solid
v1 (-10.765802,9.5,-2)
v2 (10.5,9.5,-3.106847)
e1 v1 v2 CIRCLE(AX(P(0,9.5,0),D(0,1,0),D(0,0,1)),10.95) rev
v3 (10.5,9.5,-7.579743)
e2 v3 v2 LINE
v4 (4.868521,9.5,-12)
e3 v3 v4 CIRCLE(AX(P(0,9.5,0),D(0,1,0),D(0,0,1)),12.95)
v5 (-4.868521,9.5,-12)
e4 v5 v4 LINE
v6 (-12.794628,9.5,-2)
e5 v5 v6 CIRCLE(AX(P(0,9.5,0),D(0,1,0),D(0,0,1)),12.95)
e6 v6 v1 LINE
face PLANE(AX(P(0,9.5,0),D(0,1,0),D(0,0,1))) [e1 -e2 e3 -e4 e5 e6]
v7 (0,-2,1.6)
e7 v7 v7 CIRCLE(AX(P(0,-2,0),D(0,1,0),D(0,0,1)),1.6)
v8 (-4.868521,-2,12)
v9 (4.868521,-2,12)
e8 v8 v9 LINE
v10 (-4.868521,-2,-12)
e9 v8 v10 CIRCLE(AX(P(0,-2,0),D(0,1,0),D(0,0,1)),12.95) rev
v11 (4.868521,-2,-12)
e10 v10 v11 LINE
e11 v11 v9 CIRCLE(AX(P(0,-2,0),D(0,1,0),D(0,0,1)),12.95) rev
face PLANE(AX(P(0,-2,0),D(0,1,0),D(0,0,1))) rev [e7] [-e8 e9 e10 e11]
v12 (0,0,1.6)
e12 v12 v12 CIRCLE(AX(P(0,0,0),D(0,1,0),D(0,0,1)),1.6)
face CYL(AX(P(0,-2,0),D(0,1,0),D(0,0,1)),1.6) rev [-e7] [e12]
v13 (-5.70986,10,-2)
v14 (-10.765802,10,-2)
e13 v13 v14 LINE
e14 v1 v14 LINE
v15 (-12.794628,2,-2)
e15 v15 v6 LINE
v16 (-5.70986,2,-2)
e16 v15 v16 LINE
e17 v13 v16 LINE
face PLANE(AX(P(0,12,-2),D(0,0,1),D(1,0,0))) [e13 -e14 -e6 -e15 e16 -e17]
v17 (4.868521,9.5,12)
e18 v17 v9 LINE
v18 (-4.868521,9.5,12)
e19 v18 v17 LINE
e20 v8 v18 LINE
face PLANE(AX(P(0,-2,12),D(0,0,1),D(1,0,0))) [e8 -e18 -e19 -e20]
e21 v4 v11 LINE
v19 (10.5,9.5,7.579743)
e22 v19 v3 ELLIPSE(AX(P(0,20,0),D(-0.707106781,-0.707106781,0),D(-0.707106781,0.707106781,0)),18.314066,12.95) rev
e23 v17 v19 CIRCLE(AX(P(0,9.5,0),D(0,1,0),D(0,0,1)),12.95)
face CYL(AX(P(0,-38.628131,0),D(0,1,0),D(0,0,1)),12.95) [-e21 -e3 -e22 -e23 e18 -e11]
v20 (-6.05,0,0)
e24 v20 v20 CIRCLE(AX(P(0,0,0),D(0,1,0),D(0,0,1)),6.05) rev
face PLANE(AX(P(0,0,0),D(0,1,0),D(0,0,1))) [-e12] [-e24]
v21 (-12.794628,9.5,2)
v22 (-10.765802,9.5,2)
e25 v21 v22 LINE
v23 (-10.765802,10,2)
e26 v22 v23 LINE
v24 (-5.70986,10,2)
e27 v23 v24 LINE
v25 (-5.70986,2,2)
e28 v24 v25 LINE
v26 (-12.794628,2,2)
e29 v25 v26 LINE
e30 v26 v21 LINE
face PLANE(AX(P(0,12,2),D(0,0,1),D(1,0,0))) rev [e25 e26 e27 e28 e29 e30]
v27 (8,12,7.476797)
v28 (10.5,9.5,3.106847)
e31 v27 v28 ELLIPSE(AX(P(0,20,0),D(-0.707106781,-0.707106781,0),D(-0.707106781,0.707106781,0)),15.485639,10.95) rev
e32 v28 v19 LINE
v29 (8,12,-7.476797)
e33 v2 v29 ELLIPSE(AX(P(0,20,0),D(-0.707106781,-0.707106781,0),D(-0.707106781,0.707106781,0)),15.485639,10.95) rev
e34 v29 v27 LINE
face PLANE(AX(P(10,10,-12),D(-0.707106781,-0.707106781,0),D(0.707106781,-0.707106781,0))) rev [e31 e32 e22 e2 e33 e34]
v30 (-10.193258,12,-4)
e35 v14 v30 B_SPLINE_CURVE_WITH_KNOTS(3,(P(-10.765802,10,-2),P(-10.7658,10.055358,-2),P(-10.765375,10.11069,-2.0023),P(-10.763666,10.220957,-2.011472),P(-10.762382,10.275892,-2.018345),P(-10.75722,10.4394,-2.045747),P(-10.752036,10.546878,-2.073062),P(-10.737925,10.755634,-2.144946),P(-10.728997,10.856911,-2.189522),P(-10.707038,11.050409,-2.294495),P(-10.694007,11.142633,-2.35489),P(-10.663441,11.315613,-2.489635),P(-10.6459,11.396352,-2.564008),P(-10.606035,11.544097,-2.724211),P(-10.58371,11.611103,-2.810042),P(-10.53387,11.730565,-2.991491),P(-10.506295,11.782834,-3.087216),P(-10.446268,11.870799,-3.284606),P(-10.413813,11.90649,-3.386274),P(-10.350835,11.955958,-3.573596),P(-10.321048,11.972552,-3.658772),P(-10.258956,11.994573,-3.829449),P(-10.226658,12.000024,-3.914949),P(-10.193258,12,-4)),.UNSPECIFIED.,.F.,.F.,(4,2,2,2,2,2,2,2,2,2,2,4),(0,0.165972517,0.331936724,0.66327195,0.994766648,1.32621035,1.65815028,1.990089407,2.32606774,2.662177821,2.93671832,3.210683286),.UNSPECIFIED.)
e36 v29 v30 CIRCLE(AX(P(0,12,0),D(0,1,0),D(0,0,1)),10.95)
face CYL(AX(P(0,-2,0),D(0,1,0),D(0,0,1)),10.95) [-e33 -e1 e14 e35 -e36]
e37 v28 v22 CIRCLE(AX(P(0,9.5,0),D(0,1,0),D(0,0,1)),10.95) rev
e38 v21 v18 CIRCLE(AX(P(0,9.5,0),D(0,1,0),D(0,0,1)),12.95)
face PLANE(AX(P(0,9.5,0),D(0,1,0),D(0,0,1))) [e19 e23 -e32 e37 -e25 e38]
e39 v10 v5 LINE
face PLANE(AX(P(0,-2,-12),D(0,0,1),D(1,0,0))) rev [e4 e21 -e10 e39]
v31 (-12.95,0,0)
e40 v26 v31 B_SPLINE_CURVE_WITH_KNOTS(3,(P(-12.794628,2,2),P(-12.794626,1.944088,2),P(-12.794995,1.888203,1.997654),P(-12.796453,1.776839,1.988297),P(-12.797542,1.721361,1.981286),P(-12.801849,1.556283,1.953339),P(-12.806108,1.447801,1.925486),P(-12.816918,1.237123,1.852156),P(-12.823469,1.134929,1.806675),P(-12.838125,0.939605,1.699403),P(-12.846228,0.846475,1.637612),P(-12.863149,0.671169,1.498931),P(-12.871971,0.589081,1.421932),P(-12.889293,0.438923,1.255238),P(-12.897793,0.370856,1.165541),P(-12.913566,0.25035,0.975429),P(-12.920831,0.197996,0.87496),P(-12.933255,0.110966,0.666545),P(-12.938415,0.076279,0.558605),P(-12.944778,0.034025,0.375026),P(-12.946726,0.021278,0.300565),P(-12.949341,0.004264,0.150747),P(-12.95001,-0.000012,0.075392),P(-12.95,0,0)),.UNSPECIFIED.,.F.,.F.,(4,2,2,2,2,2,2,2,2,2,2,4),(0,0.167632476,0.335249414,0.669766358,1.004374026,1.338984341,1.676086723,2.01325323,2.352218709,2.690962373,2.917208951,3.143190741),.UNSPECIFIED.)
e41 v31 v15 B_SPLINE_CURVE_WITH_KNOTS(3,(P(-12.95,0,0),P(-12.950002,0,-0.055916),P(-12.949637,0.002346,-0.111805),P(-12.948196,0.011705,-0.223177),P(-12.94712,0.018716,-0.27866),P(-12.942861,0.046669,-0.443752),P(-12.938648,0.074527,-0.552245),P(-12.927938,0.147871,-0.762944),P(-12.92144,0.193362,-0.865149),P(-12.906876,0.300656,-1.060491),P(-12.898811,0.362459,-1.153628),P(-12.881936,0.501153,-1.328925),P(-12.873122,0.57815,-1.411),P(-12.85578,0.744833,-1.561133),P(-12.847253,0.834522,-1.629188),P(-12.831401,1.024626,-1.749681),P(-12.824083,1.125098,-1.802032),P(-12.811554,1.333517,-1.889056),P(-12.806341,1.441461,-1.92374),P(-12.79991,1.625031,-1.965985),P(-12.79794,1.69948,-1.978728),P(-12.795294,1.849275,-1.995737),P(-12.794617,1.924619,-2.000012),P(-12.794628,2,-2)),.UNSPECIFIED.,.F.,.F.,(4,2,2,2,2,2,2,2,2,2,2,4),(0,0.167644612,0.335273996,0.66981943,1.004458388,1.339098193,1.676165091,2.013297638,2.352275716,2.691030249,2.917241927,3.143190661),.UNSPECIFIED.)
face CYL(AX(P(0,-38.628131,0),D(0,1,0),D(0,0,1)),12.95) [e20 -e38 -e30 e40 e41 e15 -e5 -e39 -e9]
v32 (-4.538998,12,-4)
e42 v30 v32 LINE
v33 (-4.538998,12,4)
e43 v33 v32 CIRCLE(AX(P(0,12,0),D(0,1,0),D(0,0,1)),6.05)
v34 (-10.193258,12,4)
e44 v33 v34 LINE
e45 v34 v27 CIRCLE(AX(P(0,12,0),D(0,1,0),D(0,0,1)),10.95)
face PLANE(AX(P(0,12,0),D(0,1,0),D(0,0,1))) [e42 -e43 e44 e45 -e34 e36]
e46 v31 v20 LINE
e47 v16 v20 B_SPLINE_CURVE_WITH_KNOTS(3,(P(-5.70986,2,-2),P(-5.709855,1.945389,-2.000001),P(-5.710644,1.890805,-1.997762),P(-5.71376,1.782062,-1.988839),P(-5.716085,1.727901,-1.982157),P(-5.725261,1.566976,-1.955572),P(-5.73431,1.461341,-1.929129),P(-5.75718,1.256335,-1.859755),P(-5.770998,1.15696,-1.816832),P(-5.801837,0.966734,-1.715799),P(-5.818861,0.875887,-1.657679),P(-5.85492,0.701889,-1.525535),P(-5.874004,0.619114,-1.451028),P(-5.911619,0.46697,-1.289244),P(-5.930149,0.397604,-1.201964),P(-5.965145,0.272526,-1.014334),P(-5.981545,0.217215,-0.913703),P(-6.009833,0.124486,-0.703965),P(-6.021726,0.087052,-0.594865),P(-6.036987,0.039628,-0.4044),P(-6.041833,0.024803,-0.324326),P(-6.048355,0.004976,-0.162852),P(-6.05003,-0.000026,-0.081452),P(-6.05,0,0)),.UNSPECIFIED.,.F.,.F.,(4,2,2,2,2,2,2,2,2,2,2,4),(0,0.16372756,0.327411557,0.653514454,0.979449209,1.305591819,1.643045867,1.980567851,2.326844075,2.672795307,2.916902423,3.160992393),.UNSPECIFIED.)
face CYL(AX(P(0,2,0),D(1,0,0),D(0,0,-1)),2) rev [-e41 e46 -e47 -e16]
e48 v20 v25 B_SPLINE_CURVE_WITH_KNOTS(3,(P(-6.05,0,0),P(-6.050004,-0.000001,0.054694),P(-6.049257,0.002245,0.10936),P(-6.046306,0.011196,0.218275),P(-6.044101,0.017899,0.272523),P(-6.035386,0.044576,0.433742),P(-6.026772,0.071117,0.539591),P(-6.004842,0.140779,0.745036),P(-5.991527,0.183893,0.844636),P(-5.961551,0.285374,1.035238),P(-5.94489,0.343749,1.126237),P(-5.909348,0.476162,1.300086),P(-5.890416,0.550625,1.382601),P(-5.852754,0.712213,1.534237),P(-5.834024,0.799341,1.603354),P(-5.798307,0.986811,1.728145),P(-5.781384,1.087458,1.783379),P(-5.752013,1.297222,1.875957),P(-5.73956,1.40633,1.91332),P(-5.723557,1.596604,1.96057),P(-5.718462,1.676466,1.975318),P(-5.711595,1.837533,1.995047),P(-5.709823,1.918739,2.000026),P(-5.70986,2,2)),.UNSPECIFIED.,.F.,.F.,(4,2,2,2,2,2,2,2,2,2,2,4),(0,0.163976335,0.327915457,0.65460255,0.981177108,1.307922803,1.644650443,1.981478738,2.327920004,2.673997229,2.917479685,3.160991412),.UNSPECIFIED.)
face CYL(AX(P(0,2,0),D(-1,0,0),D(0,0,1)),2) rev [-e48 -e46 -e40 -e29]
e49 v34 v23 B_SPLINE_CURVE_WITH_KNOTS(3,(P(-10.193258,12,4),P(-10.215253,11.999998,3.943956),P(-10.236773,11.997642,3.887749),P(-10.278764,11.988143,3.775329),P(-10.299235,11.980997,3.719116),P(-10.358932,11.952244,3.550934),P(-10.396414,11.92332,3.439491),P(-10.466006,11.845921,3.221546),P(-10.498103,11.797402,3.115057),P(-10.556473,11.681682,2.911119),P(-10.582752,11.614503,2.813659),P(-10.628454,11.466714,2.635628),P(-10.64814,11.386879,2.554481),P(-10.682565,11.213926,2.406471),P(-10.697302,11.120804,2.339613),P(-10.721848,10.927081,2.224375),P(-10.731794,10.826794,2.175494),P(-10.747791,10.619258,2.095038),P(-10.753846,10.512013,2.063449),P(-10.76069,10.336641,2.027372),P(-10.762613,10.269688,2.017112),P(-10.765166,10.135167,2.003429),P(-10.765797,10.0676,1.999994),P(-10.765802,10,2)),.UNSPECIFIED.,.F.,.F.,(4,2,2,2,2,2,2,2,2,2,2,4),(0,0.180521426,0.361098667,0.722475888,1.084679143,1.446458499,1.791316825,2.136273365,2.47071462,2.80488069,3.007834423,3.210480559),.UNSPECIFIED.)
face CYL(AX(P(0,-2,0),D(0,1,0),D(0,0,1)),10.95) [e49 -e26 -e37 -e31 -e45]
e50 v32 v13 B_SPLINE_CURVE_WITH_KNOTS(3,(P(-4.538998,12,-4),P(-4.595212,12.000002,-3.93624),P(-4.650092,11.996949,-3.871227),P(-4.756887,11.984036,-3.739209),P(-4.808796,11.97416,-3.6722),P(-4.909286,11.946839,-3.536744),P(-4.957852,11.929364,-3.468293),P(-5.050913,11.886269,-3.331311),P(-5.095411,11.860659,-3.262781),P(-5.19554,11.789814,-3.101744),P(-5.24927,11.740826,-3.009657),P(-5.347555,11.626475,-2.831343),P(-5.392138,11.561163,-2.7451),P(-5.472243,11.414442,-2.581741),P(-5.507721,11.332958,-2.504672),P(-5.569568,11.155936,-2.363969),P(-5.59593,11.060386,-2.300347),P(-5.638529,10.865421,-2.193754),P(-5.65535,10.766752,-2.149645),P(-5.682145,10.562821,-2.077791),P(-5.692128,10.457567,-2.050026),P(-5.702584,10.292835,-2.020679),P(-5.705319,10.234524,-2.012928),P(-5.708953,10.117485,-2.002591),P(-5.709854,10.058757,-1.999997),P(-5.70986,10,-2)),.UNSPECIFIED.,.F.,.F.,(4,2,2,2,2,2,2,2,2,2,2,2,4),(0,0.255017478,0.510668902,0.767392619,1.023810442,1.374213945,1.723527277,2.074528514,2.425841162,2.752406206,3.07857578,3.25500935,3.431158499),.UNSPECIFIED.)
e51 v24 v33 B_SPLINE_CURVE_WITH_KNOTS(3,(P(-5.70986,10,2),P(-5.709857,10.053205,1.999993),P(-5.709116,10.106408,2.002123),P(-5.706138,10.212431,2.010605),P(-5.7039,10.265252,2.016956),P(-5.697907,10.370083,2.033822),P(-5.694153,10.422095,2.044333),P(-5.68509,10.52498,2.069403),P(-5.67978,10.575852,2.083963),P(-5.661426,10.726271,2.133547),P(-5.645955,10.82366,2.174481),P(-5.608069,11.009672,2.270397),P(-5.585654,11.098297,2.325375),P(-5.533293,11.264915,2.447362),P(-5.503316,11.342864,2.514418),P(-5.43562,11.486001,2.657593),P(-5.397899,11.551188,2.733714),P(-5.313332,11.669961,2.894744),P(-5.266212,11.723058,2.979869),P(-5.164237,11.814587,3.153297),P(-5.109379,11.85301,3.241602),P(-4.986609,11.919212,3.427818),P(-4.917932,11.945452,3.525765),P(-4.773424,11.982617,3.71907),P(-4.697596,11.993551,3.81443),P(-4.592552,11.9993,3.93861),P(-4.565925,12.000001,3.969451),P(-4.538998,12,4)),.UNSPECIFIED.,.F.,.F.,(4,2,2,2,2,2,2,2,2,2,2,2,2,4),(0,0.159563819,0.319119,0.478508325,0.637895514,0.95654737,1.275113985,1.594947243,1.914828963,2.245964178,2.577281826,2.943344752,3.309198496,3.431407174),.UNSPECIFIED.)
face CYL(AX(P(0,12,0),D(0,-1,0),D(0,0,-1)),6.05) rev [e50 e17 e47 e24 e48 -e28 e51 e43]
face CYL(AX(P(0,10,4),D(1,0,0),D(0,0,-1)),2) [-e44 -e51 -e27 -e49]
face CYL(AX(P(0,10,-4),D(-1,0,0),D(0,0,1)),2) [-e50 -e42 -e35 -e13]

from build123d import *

# Parameters (mm, degrees)
SKETCH1_R               = 10.95
SKETCH1_R_2             = 6.05
BOSS_EXTRUDE1_DEPTH     = 2
BOSS_EXTRUDE2_START     = 12
SKETCH1_3_R             = 10.95
SKETCH1_3_R_2           = 6.05
BOSS_EXTRUDE2_DEPTH     = 12
BOSS_EXTRUDE3_START     = -2.5
SKETCH2_R               = 12.95
SKETCH2_R_2             = 10.95
BOSS_EXTRUDE3_DEPTH     = 11.5
CUT_EXTRUDE1_DEPTH      = 22.895319134
CUT_EXTRUDE1_DEPTH_BACK = 22.895319134
SKETCH3_W               = 100
SKETCH3_H               = 24
CUT_EXTRUDE3_DEPTH      = 22.347189511
CUT_EXTRUDE3_DEPTH_BACK = 22.347189511
SKETCH5_W               = 18
SKETCH5_H               = 4
CUT_EXTRUDE4_DEPTH      = 22.347189511
FILLET1_R               = 2
CUT_EXTRUDE5_DEPTH      = 22.347189684
CUT_EXTRUDE5_DEPTH_BACK = 22.347189684
SKETCH6_R               = 1.6


with BuildPart() as part:
    # Sketch1 → Boss-Extrude1 (new body)
    # profile 1 of 2: a face of its own
    with BuildSketch(Plane(origin=(0, 0, 0), x_dir=(1, 0, 0), z_dir=(0, 1, 0))):
        with Locations(Location((0, 0, 0), (0, 0, 270))):
            Circle(SKETCH1_R)
        Circle(SKETCH1_R_2, mode=Mode.SUBTRACT)
    # profile 2 of 2: a face of its own
    with BuildSketch(Plane(origin=(0, 0, 0), x_dir=(1, 0, 0), z_dir=(0, 1, 0))):
        Circle(SKETCH1_R_2)
    extrude(amount=-BOSS_EXTRUDE1_DEPTH)

    # Sketch1<3> → Boss-Extrude2 (add)
    with BuildSketch(Plane(origin=(0, 0, 0), x_dir=(1, 0, 0), z_dir=(0, 1, 0)).offset(BOSS_EXTRUDE2_START)):
        with Locations(Location((0, 0, 0), (0, 0, 270))):
            Circle(SKETCH1_3_R)
        with Locations(Location((0, 0, 0), (0, 0, 270))):
            Circle(SKETCH1_3_R_2, mode=Mode.SUBTRACT)
    extrude(amount=-BOSS_EXTRUDE2_DEPTH)

    # Sketch2 → Boss-Extrude3 (add)
    with BuildSketch(Plane(origin=(0, 12, 0), x_dir=(1, 0, 0), z_dir=(0, 1, 0)).offset(BOSS_EXTRUDE3_START)):
        with Locations(Location((0, 0, 0), (0, 0, 270))):
            Circle(SKETCH2_R)
        with Locations(Location((0, 0, 0), (0, 0, 270))):
            Circle(SKETCH2_R_2, mode=Mode.SUBTRACT)
    extrude(amount=-BOSS_EXTRUDE3_DEPTH)

    # Sketch3 → Cut-Extrude1 (cut, two sides: drawn at the far end of the back side and taken through both)
    with BuildSketch(Plane(origin=(0, 0, 0), x_dir=(1, 0, 0), z_dir=(0, 1, 0)).offset(-CUT_EXTRUDE1_DEPTH_BACK)):
        with Locations((0, -24)):
            Rectangle(SKETCH3_W, SKETCH3_H)
        with Locations((0, 24)):
            Rectangle(SKETCH3_W, SKETCH3_H)
    extrude(amount=CUT_EXTRUDE1_DEPTH + CUT_EXTRUDE1_DEPTH_BACK, mode=Mode.SUBTRACT)

    # Sketch4 → Cut-Extrude3 (cut, two sides: drawn at the far end of the back side and taken through both)
    with BuildSketch(Plane.XY.offset(-CUT_EXTRUDE3_DEPTH_BACK)):
        Polygon((13, 15), (5, 15), (13, 7), align=None)
    extrude(amount=CUT_EXTRUDE3_DEPTH + CUT_EXTRUDE3_DEPTH_BACK, mode=Mode.SUBTRACT)

    # Sketch5 → Cut-Extrude4 (cut, through all)
    with BuildSketch(Plane(origin=(0, 0, 0), x_dir=(1, 0, 0), z_dir=(0, 1, 0))):
        with Locations((-11, 0)):
            Rectangle(SKETCH5_W, SKETCH5_H)
    extrude(amount=CUT_EXTRUDE4_DEPTH, mode=Mode.SUBTRACT)

    # Fillet1
    fillet1_edges = [part.edges().sort_by_distance(p)[0] for p in [
        (-8.237831116, 12, 2),
        (-8.237831116, 12, -2),
        (-9.252243836, 0, -2),
        (-9.252243836, 0, 2),
    ]]
    fillet(fillet1_edges, radius=FILLET1_R - 0.0001)  # a hair under: the kernel refuses the full size

    # Sketch6 → Cut-Extrude5 (cut, two sides: drawn at the far end of the back side and taken through both)
    with BuildSketch(Plane(origin=(0, 0, 0), x_dir=(1, 0, 0), z_dir=(0, 1, 0)).offset(-CUT_EXTRUDE5_DEPTH_BACK)):
        with Locations(Location((0, 0, 0), (0, 0, 270))):
            Circle(SKETCH6_R)
    extrude(amount=CUT_EXTRUDE5_DEPTH + CUT_EXTRUDE5_DEPTH_BACK, mode=Mode.SUBTRACT)


solid = part.part
